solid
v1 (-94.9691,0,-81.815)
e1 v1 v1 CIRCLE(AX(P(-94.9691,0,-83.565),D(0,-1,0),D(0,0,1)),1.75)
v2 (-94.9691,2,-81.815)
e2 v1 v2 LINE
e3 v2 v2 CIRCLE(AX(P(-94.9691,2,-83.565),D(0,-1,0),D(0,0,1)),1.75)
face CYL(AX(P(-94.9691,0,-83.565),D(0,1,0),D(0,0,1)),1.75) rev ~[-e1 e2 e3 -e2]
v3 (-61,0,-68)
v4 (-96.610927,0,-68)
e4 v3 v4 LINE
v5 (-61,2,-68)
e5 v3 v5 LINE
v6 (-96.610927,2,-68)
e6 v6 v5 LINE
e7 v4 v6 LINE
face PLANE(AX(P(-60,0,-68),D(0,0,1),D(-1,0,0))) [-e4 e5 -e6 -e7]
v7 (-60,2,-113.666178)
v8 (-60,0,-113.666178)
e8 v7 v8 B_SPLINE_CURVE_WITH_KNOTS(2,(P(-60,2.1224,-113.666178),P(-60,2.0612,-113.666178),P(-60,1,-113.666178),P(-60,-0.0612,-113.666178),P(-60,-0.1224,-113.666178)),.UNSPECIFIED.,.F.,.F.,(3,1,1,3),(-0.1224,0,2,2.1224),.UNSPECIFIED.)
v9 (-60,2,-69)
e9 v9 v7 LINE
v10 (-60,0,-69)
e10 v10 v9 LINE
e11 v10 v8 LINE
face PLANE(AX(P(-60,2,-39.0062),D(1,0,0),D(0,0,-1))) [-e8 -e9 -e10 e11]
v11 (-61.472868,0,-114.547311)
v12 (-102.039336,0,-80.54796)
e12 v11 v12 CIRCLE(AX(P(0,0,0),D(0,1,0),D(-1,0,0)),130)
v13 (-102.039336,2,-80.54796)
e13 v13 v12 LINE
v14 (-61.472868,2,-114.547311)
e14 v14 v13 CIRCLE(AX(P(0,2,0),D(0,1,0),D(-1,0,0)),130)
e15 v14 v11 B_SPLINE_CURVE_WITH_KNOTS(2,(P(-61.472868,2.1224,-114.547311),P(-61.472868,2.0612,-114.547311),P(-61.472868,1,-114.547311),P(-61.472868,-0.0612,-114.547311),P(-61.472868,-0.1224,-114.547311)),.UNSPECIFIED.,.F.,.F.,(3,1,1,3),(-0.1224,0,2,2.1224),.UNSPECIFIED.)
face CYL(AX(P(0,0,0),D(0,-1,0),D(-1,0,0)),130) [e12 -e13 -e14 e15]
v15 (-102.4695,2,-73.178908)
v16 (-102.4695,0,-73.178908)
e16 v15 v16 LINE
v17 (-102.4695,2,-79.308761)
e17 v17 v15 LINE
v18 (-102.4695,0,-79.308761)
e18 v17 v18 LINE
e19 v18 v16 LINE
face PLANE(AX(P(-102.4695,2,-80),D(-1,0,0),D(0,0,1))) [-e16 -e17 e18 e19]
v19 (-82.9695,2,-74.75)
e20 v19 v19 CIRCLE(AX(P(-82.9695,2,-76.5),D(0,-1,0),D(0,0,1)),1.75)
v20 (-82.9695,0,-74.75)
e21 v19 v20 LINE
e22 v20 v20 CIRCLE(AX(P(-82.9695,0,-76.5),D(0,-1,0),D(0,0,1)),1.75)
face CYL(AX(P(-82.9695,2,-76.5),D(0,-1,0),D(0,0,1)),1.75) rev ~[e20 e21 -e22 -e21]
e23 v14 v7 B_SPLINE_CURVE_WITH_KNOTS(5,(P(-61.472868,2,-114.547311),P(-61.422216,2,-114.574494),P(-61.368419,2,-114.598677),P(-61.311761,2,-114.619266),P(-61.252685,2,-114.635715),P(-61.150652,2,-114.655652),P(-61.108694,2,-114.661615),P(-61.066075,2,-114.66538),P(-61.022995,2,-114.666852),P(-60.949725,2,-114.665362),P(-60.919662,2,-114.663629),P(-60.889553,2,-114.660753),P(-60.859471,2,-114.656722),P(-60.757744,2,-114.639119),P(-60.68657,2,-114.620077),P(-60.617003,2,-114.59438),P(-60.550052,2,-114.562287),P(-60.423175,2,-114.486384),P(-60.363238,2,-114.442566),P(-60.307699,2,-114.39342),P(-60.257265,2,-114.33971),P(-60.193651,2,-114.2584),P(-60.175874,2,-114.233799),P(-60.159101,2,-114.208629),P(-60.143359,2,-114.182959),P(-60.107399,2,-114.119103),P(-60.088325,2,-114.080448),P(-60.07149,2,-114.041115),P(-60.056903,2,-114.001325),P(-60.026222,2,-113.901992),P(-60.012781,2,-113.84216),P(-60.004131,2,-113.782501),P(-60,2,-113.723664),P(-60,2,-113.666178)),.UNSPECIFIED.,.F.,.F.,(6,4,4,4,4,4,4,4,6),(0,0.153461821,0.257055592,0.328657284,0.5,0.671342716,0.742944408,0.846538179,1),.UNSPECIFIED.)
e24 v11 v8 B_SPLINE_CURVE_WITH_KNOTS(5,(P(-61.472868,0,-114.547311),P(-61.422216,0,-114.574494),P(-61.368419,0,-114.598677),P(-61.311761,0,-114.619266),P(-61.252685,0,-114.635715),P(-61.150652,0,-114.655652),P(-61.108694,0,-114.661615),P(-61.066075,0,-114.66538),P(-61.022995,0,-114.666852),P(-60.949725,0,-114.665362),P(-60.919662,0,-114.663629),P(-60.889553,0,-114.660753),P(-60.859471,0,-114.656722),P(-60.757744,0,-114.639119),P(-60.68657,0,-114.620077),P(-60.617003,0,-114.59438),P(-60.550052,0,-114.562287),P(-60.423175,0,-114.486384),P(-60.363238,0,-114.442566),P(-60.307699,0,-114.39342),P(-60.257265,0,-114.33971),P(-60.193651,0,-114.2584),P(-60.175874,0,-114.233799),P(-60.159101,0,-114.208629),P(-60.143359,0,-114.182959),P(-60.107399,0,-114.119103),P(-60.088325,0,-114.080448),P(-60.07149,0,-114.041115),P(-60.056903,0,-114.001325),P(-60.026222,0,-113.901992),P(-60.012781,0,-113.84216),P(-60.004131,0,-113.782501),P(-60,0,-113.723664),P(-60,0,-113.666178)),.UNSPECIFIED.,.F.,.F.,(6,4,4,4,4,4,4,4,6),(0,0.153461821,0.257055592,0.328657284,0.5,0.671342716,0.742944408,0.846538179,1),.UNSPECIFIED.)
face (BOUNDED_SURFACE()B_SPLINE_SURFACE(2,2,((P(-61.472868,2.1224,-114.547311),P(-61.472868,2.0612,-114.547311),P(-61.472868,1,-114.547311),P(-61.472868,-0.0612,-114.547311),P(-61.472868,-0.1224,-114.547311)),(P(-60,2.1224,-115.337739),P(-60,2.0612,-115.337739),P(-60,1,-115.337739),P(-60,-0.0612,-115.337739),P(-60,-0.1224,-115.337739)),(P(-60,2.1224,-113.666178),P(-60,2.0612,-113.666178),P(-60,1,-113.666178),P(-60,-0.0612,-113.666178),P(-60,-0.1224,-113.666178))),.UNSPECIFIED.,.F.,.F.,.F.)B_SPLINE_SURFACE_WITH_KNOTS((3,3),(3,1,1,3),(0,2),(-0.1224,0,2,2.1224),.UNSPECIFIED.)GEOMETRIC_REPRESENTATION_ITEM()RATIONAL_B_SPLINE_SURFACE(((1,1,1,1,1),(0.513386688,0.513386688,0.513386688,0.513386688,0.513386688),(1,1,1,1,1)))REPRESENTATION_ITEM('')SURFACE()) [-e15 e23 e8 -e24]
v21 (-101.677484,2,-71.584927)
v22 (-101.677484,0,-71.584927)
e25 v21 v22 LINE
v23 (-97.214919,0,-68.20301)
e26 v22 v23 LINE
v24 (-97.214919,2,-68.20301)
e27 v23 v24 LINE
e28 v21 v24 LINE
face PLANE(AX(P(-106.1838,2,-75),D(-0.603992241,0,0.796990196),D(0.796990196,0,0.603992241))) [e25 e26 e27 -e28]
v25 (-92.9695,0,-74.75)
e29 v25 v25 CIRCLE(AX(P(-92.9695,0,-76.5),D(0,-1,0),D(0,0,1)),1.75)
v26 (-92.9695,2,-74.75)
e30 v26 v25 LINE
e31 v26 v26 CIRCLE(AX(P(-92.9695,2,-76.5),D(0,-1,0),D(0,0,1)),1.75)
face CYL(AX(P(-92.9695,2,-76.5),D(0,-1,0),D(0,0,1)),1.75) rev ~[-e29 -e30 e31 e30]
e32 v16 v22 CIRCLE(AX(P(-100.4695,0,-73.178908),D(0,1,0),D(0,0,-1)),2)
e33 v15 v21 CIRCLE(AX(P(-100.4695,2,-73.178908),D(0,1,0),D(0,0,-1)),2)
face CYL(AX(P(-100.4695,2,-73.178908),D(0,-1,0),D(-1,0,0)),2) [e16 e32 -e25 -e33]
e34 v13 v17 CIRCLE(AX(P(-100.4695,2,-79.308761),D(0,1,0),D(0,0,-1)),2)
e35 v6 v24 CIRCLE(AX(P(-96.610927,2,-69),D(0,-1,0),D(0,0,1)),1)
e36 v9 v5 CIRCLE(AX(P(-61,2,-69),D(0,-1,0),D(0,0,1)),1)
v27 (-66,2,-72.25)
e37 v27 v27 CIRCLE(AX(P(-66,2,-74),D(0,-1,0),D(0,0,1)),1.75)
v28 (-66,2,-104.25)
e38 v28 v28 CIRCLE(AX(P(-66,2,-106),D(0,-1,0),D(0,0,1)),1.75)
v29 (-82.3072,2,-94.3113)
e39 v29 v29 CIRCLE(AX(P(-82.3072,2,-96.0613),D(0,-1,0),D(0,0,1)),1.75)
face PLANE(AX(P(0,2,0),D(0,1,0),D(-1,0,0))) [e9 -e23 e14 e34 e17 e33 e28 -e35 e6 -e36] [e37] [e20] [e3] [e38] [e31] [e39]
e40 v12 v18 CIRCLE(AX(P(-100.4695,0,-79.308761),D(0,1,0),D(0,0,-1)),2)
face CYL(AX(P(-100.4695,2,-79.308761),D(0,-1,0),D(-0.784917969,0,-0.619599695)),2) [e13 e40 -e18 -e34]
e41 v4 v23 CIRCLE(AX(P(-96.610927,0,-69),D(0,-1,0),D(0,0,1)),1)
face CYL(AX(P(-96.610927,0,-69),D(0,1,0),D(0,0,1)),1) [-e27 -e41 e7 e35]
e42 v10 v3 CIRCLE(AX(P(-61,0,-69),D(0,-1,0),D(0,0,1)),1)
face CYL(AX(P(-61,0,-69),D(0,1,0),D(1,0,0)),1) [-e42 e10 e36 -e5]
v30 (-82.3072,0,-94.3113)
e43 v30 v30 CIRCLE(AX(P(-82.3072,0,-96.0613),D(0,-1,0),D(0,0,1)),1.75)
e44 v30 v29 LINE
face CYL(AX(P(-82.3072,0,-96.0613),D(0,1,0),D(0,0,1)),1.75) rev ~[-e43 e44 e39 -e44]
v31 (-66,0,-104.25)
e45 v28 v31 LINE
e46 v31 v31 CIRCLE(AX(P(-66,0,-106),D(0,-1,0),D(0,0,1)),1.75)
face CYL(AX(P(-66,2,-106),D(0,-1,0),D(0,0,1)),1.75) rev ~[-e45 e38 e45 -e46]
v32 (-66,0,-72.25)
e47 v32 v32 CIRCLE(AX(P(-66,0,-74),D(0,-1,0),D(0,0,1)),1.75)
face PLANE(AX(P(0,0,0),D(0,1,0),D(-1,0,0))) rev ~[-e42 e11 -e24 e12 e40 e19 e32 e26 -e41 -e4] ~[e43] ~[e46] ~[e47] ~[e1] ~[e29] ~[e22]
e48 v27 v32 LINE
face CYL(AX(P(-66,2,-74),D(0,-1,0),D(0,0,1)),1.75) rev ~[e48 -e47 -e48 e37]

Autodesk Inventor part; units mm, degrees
ref_plane "YZ Plane" through (0, 0, 0) normal (1, 0, 0) x (0, 1, 0)
ref_plane "XZ Plane" through (0, 0, 0) normal (0, 1, 0) x (-1, 0, 0)
ref_plane "XY Plane" through (0, 0, 0) normal (0, 0, 1) x (1, 0, 0)
sketch "スケッチ1" plane through (0, 0, 0) normal (0, 1, 0) x (-1, 0, 0)
  circle A0 centre (0, 0) radius 130
  dimension "d0" = 260
extrude "プレート1" add sketch "スケッチ1" along normal blind 2
sketch "スケッチ2" plane through (0, 2, 0) normal (0, 1, 0) x (1, 0, 0)
  line L0 (85, -40) -> (109, -40)
  line L1 (109, -40) -> (109, 40)
  line L2 (109, 40) -> (85, 40)
  line L3 (85, 40) -> (85, -40)
  line L4 (85, -40) -> (109, 40) construction
  line L5 (109, -40) -> (85, 40) construction
  point P0 (0, 0)
  point P1 (97, 0)
  dimension "d2" = 24
  dimension "d3" = 85
  dimension "d6" = 80
extrude "押し出し1" cut sketch "スケッチ2" against normal through all
fillet "フィレット1" radius 10 4 edges at (109, 1, 40) (85, 1, 40) (85, 1, -40) (109, 1, -40)
sketch "スケッチ3" plane through (0, 2, 0) normal (0, 1, 0) x (1, 0, 0)
  line L0 (85, -30) -> (85, 30) projected
  line L1 (109, 30) -> (109, -30) projected
  line L2 (95, 40) -> (99, 40) projected
  line L3 (99, -40) -> (95, -40) projected
  line L4 (82, -20) -> (112, -20) construction
  line L5 (112, -20) -> (112, 20) construction
  line L6 (112, 20) -> (82, 20) construction
  line L7 (82, 20) -> (82, -20) construction
  line L8 (82, -20) -> (112, 20) construction
  line L9 (112, -20) -> (82, 20) construction
  point P0 (0, 0)
  point P1 (97, 0)
  point P2 (97, 40)
  point P3 (109, 0)
  dimension "d8" = 30
  dimension "d9" = 40
hole "穴1" at (82, 2, 20) at (112, 2, 20) at (112, 2, -20) at (82, 2, -20) direction (0, -1, 0) diameter 3.5 depth 2 tip angle 118
sketch "スケッチ4" plane through (0, 2, 0) normal (0, 1, 0) x (1, 0, 0)
  circle A0 centre (0, 0) radius 130 projected
  line L0 (-106.1838, 75) -> (-60, 40)
  line L1 (-60, 40) -> (-60, -40)
  line L2 (-60, -40) -> (-106.1838, -75)
  point P0 (-60, 0)
  dimension "d17" = 40
  dimension "d18" = 75
  dimension "d19" = 60
extrude "押し出し2" cut sketch "スケッチ4" against normal through all contours L0 L1 L2 A0 picked at (-83.3333, 0)
sketch "スケッチ5" plane through (0, 2, 0) normal (0, 1, 0) x (1, 0, 0)
  line L0 (-47.5, 87) -> (47.5, 87)
  line L1 (47.5, 87) -> (47.5, 106)
  line L2 (47.5, 106) -> (-47.5, 106)
  line L3 (-47.5, 106) -> (-47.5, 87)
  line L4 (-47.5, 87) -> (47.5, 106) construction
  line L5 (47.5, 87) -> (-47.5, 106) construction
  line L6 (-13.5, 81.5) -> (13.5, 81.5)
  line L7 (13.5, 81.5) -> (13.5, 87)
  line L8 (13.5, 87) -> (-13.5, 87)
  line L9 (-13.5, 87) -> (-13.5, 81.5)
  line L10 (-13.5, 81.5) -> (13.5, 87) construction
  line L11 (13.5, 81.5) -> (-13.5, 87) construction
  line L12 (-13.5, 81.5) -> (-12.7575, 82.2425) construction
  line L13 (-13.5, 81.5) -> (-12.45, 81.5) construction
  line L14 (13.5, 81.5) -> (12.7575, 82.2425) construction
  line L15 (13.5, 81.5) -> (14.55, 81.5) construction
  circle A0 centre (12.7575, 82.2425) radius 1.05
  circle A1 centre (-12.7575, 82.2425) radius 1.05
  line L16 (47.5, 87) -> (62.5, 87)
  line L17 (62.5, 87) -> (62.5, 97)
  line L18 (62.5, 97) -> (47.5, 97)
  line L19 (47.5, 97) -> (47.5, 87)
  line L20 (-13.5, 111.5) -> (13.5, 111.5)
  line L21 (13.5, 111.5) -> (13.5, 106)
  line L22 (13.5, 106) -> (-13.5, 106)
  line L23 (-13.5, 106) -> (-13.5, 111.5)
  line L24 (-13.5, 111.5) -> (13.5, 106) construction
  line L25 (13.5, 111.5) -> (-13.5, 106) construction
  line L26 (-13.5, 111.5) -> (-12.7575, 110.7575) construction
  line L27 (-13.5, 111.5) -> (-12.45, 111.5) construction
  line L28 (13.5, 111.5) -> (12.7575, 110.7575) construction
  line L29 (13.5, 111.5) -> (14.55, 111.5) construction
  circle A2 centre (-12.7575, 110.7575) radius 1.05
  circle A3 centre (12.7575, 110.7575) radius 1.05
  point P0 (0, 0)
  point P1 (0, 96.5)
  point P2 (0, 84.25)
  point P3 (-13.5, 82.9849)
  point P4 (-12.0151, 81.5)
  point P5 (12.0151, 81.5)
  point P6 (13.5, 82.9849)
  point P7 (47.5, 97)
  point P8 (0, 108.75)
  point P9 (-13.5, 110.0151)
  point P10 (13.5, 110.0151)
  point P11 (12.0151, 111.5)
  point P12 (-12.0151, 111.5)
  dimension "d22" = 19
  dimension "d23" = 95
  dimension "d24" = 87
  dimension "d25" = 5.5
  dimension "d26" = 27
  dimension "d27" = 1.05
  dimension "d28" = 45
  dimension "d29" = 1.05
  dimension "d30" = 135
  dimension "d44" = 10
  dimension "d45" = 15
  dimension "d46" = 5.5
  dimension "d47" = 1.05
  dimension "d48" = 45
  dimension "d49" = 1.05
  dimension "d50" = 135
extrude "押し出し3" cut sketch "スケッチ5" against normal through all
sketch "スケッチ6" plane through (0, 2, 0) normal (0, 1, 0) x (1, 0, 0)
  line L0 (-20, 84) -> (20, 84) construction
  line L1 (-20, 84) -> (20, 84) construction
  line L2 (12.0151, 81.5) -> (-12.0151, 81.5) construction
  line L3 (-20, 109) -> (20, 109) construction
  line L4 (13.5, 106) -> (47.5, 106) construction
  line L5 (-20, 109) -> (20, 109) construction
  line L6 (-12.0151, 111.5) -> (12.0151, 111.5) construction
  point P0 (0, 0)
  point P1 (0, 84)
  point P2 (0, 109)
  point P3 (0, 84)
  dimension "d33" = 40
  dimension "d34" = 0
  dimension "d35" = 2.5
  dimension "d51" = 40
  dimension "d52" = 0
  dimension "d53" = 2.5
hole "穴2" at (20, 2, -84) at (-20, 2, -84) at (-20, 2, -109) at (20, 2, -109) direction (0, -1, 0) diameter 3.5 depth 2 tip angle 118
fillet "フィレット2" radius 1 4 edges at (-13.5, 1, -87) (13.5, 1, -87) (-13.5, 1, -106) (13.5, 1, -106)
fillet "フィレット3" radius 3 6 edges at (-47.5, 1, -87) (-47.5, 1, -106) (47.5, 1, -106) (47.5, 1, -97) (62.5, 1, -97) (62.5, 1, -87)
mirror "ミラー1" about plane through (0, 0, 0) normal (0, 0, 1) of "穴2", "押し出し3", "フィレット2", "フィレット3"
sketch "スケッチ7" plane through (0, 2, 0) normal (0, 1, 0) x (1, 0, 0)
  arc A0 (-106.1838, -75) -> (-106.1838, 75) centre (0, 0) ccw projected
  line L0 (-48.7827, 120.5) -> (48.7827, 120.5)
  line L1 (-48.7827, -120.5) -> (48.7827, -120.5)
  line L2 (123, -42.0833) -> (123, 42.0833)
  line L3 (-12.0151, 111.5) -> (12.0151, 111.5) projected
  circle A1 centre (112, 20) radius 1.75 projected
  line L4 (12.0151, -111.5) -> (-12.0151, -111.5) projected
  dimension "d55" = 9
  dimension "d56" = 11
  dimension "d57" = 9
extrude "押し出し4" cut sketch "スケッチ7" against normal through all contours L1 A0 | L2 A0 | L0 A0
fillet "フィレット4" radius 50 6 edges at (48.7827, 1, 120.5) (-48.7827, 1, 120.5) (123, 1, -42.0833) (123, 1, 42.0833) (-48.7827, 1, -120.5) (48.7827, 1, -120.5)
sketch "スケッチ8" plane through (0, 0, 0) normal (0, -1, 0) x (1, 0, 0)
  arc A0 (97.4046, 79.5902) -> (95.9996, 79.4659) centre (96.7931, 78.5) ccw projected
  arc A1 (52.5865, 79.4659) -> (51.1816, 79.5902) centre (51.7931, 78.5) ccw projected
  point P0 (0, 0)
hole "穴3" at (96.7931, 0, 78.5) at (51.7931, 0, 78.5) direction (0, 1, 0) diameter 3.5 depth 2 tip angle 118
sketch "スケッチ10" plane through (0, 2, 0) normal (0, 1, 0) x (1, 0, 0)
  line L0 (-32.5, -116.5) -> (32.5, -116.5) construction
  line L1 (-32.5, -116.5) -> (32.5, -116.5) construction
  line L2 (-37.812, -120.5) -> (37.812, -120.5) construction
  point P0 (0, 0)
  point P1 (0, -116.5)
  dimension "d78" = 65
  dimension "d79" = 0
  dimension "d80" = 4
hole "穴5" at (32.5, 2, 116.5) at (-32.5, 2, 116.5) direction (0, -1, 0) diameter 3.5 end through all
mirror "ミラー2" about plane through (0, 0, 0) normal (0, 0, 1) of "穴3", "穴5"
sketch "スケッチ9" plane through (0, 2, 0) normal (0, 1, 0) x (1, 0, 0)
  line L0 (110, -55) -> (110, 55) construction
  line L1 (109, 30) -> (109, -30) construction
  line L2 (110, -55) -> (220, -55) construction
  point P0 (0, 0)
  point P1 (110, 0)
  dimension "d68" = 110
  dimension "d69" = 90
  dimension "d70" = 110
hole "穴4" at (110, 2, 55) at (110, 2, -55) direction (0, -1, 0) diameter 3.5 depth 2 tip angle 118
sketch "スケッチ11" plane through (0, 2, 0) normal (0, 1, 0) x (1, 0, 0)
  line L0 (-45, 7.5) -> (40, 7.5) construction
  line L1 (40, 7.5) -> (40, 72.5) construction
  line L2 (40, 72.5) -> (-45, 72.5) construction
  line L3 (-45, 72.5) -> (-45, 7.5) construction
  line L4 (-45, 7.5) -> (40, 72.5) construction
  line L5 (40, 7.5) -> (-45, 72.5) construction
  line L6 (-60, 40) -> (-60, -40) construction
  point P0 (0, 0)
  point P1 (-2.5, 40)
  dimension "d88" = 85
  dimension "d89" = 65
  dimension "d90" = 7.5
  dimension "d91" = 15
hole "穴6" at (-45, 2, -7.5) at (40, 2, -7.5) at (40, 2, -72.5) at (-45, 2, -72.5) direction (0, -1, 0) diameter 2.5 end through all
sketch "スケッチ12" plane through (0, 2, 0) normal (0, 1, 0) x (1, 0, 0)
  line L0 (-15, 40) -> (10, 40) construction
  line L1 (-15, 10) -> (10, 10)
  line L2 (10, 70) -> (-15, 70)
  arc A0 (-15, 70) -> (-15, 10) centre (-15, 40) ccw
  arc A1 (10, 10) -> (10, 70) centre (10, 40) ccw
  circle A2 centre (-45, 72.5) radius 1.25 projected
  circle A3 centre (-45, 7.5) radius 1.25 projected
  point P0 (0, 0)
  point P1 (-2.5, 40)
  dimension "d99" = 25
  dimension "d100" = 30
  dimension "d101" = 42.5
  dimension "d102" = 32.5
extrude "押し出し5" cut sketch "スケッチ12" against normal through all contours A0 L2 A1 L1
mirror "ミラー3" about plane through (0, 0, 0) normal (0, 0, 1) of "穴6", "押し出し5"
sketch "スケッチ13" plane through (0, 2, 0) normal (0, 1, 0) x (1, 0, 0)
  line L0 (-15, 0) -> (15, 0) construction
  line L1 (-15, 0) -> (15, 0) construction
  point P0 (0, 0)
  point P1 (0, 0)
  dimension "d105" = 30
  dimension "d106" = 0
hole "穴7" at (-15, 2, 0) at (15, 2, 0) direction (0, -1, 0) diameter 2.5 end through all
sketch "スケッチ14" plane through (0, 2, 0) normal (0, 1, 0) x (1, 0, 0)
  line L0 (-106.1838, 75) -> (-60, 40) projected
  arc A0 (-61.4446, 114.5625) -> (-106.1838, 75) centre (0, 0) ccw projected
  line L1 (-60, -40) -> (-106.1838, -75) projected
  arc A1 (-106.1838, -75) -> (-61.4446, -114.5625) centre (0, 0) ccw projected
  line L2 (-102.4695, 80) -> (-102.4695, -80)
  line L3 (-102.4695, 80) -> (57.5305, 80) construction
  point P0 (-102.4695, 72.1852)
  point P1 (-102.4695, -72.1852)
  dimension "d114" = 160
  dimension "d115" = 90
extrude "押し出し6" cut sketch "スケッチ14" against normal through all
sketch "スケッチ15" plane through (0, 2, 0) normal (0, 1, 0) x (1, 0, 0)
  line L0 (-92.9695, -76.5) -> (-82.9695, -76.5) construction
  line L1 (-82.9695, -76.5) -> (-82.9695, 76.5) construction
  line L2 (-82.9695, 76.5) -> (-92.9695, 76.5) construction
  line L3 (-92.9695, 76.5) -> (-92.9695, -76.5) construction
  line L4 (-92.9695, -76.5) -> (-82.9695, 76.5) construction
  line L5 (-82.9695, -76.5) -> (-92.9695, 76.5) construction
  line L6 (-102.4695, 80) -> (-102.4695, 72.1852) construction
  point P0 (0, 0)
  point P1 (-87.9695, 0)
  dimension "d118" = 10
  dimension "d119" = 153
  dimension "d120" = 9.5
hole "穴8" at (-92.9695, 2, -76.5) at (-82.9695, 2, -76.5) at (-82.9695, 2, 76.5) at (-92.9695, 2, 76.5) direction (0, -1, 0) diameter 3.5 end through all
sketch "スケッチ16" plane through (0, 0, 0) normal (0, -1, 0) x (1, 0, 0)
  circle A0 centre (-94.9691, 83.565) radius 1.75 projected
  circle A1 centre (-82.3072, 96.0613) radius 1.75 projected
  circle A2 centre (-94.9691, 83.565) radius 1.75 projected
  point P0 (0, 0)
hole "穴9" at (-94.9691, 0, 83.565) at (-82.3072, 0, 96.0613) direction (0, 1, 0) diameter 3.5 depth 2
mirror "ミラー4" about plane through (0, 0, 0) normal (0, 0, 1) of "穴9"
fillet "フィレット5" radius 2 6 edges at (-102.4695, 1, -72.1852) (-102.4695, 1, -80) (-102.4695, 1, 80) (-60, 1, -40) (-60, 1, 40) (-102.4695, 1, 72.1852)
sketch "スケッチ20" plane through (0, 2, 0) normal (0, 1, 0) x (1, 0, 0)
  line L0 (-60, 39.0062) -> (-60, -39.0062) projected
  arc A0 (-61.4446, 114.5625) -> (-102.0393, 80.548) centre (0, 0) ccw projected
  arc A1 (-102.0393, -80.548) -> (-61.4446, -114.5625) centre (0, 0) ccw projected
  arc A2 (-61.4446, -114.5625) -> (-37.812, -120.5) centre (-37.812, -70.5) ccw projected
  arc A3 (-37.812, 120.5) -> (-61.4446, 114.5625) centre (-37.812, 70.5) ccw projected
  line L1 (-60, 39.0062) -> (-60, 115.3073) construction
  line L2 (-60, -39.0062) -> (-60, -115.3073) construction
  line L3 (-66, 74) -> (-54, 74) construction
  line L4 (-54, 74) -> (-54, 106) construction
  line L5 (-54, 106) -> (-66, 106) construction
  line L6 (-66, 106) -> (-66, 74) construction
  line L7 (-66, 74) -> (-54, 106) construction
  line L8 (-54, 74) -> (-66, 106) construction
  line L9 (-66, -106) -> (-54, -106) construction
  line L10 (-54, -106) -> (-54, -74) construction
  line L11 (-54, -74) -> (-66, -74) construction
  line L12 (-66, -74) -> (-66, -106) construction
  line L13 (-66, -106) -> (-54, -74) construction
  line L14 (-54, -106) -> (-66, -74) construction
  point P0 (-60, 90)
  point P1 (-60, -90)
  dimension "d155" = 12
  dimension "d156" = 32
  dimension "d157" = 12
  dimension "d158" = 32
  dimension "d169" = 90
  dimension "d170" = 90
hole "穴10" at (-54, 2, -74) at (-66, 2, -74) at (-66, 2, -106) at (-54, 2, -106) at (-66, 2, 74) at (-54, 2, 74) at (-54, 2, 106) at (-66, 2, 106) direction (0, -1, 0) diameter 3.5 depth 2
sketch "スケッチ21" plane through (0, 2, 0) normal (0, 1, 0) x (1, 0, 0)
  line L0 (-60, 39.0062) -> (-60, -39.0062) projected
  arc A0 (-61.4446, -114.5625) -> (-37.812, -120.5) centre (-37.812, -70.5) ccw projected
  arc A1 (-37.812, 120.5) -> (-61.4446, 114.5625) centre (-37.812, 70.5) ccw projected
  arc A2 (-61.4446, 114.5625) -> (-102.0393, 80.548) centre (0, 0) ccw projected
  arc A3 (-102.0393, -80.548) -> (-61.4446, -114.5625) centre (0, 0) ccw projected
  line L1 (-60, 39.0062) -> (-60, 115.3073)
  line L2 (-60.792, -40.6002) -> (-101.6775, -71.5849) projected
  line L3 (-60, -39.0062) -> (-60, -115.3073)
  line L4 (-102.4695, -73.1789) -> (-102.4695, -79.3088) projected
  arc A4 (-101.6775, -71.5849) -> (-102.4695, -73.1789) centre (-100.4695, -73.1789) ccw projected
  arc A5 (-102.4695, -79.3088) -> (-102.0393, -80.548) centre (-100.4695, -79.3088) ccw projected
  line L5 (-101.6775, 71.5849) -> (-60.792, 40.6002) projected
  line L6 (-102.4695, 79.3088) -> (-102.4695, 73.1789) projected
  arc A6 (-102.4695, 73.1789) -> (-101.6775, 71.5849) centre (-100.4695, 73.1789) ccw projected
  arc A7 (-102.0393, 80.548) -> (-102.4695, 79.3088) centre (-100.4695, 79.3088) ccw projected
  arc A8 (-60, 39.0062) -> (-60.792, 40.6002) centre (-62, 39.0062) ccw projected
  line L7 (37.812, 120.5) -> (-37.812, 120.5) projected
  arc A9 (61.4446, 114.5625) -> (37.812, 120.5) centre (37.812, 70.5) ccw projected
  arc A10 (118.625, 53.18) -> (61.4446, 114.5625) centre (0, 0) ccw projected
  line L8 (123, -32.7261) -> (123, 32.7261) projected
  arc A11 (123, 32.7261) -> (118.625, 53.18) centre (73, 32.7261) ccw projected
  arc A12 (118.625, -53.18) -> (123, -32.7261) centre (73, -32.7261) ccw projected
  arc A13 (61.4446, -114.5625) -> (118.625, -53.18) centre (0, 0) ccw projected
  arc A14 (37.812, -120.5) -> (61.4446, -114.5625) centre (37.812, -70.5) ccw projected
  line L9 (-37.812, -120.5) -> (37.812, -120.5) projected
  arc A15 (-60.792, -40.6002) -> (-60, -39.0062) centre (-62, -39.0062) ccw projected
  point P0 (-60.0015, 39.0827)
extrude "押し出し10" cut sketch "スケッチ21" against normal through all contours L1 A1 L7 A9 A10 A11 L8 A12 A13 A14 L9 A0 L3 L0 | L3 A0 A3 A5 L4 A4 L2 A15
sketch "スケッチ22" plane through (0, 0, 0) normal (0, -1, 0) x (1, 0, 0)
  line L0 (-60.792, -40.6002) -> (-101.6775, -71.5849) projected
  line L1 (-60, -115.3073) -> (-60, -39.0062) projected
  arc A0 (-60.792, -40.6002) -> (-60, -39.0062) centre (-62, -39.0062) ccw projected
  line L2 (-60, -68) -> (-96.947, -68)
  circle A1 centre (-66, -74) radius 1.75 projected
  point P0 (0, 0)
  dimension "d171" = 6
extrude "押し出し11" cut sketch "スケッチ22" against normal through all contours A0 L1 L2 L0
fillet "フィレット6" radius 1 3 edges at (-60, 1, -115.3073) (-96.947, 1, -68) (-60, 1, -68)
equation "\"d15\" = Thickness"
equation "\"d46\" = d25"
equation "\"d53\" = d35"
equation "\"d41\" = Thickness"
equation "\"d57\" = d55"
equation "\"d66\" = Thickness"
equation "\"d86\" = Thickness"
equation "\"d76\" = Thickness"
equation "\"d1\" = Thickness"
equation "\"BendRadius\" = Thickness"
equation "\"BendReliefWidth\" = Thickness"
equation "\"BendReliefDepth\" = 0.5 * Thickness"
equation "\"CornerReliefSize\" = 4 * Thickness"
equation "\"MinimumRemnant\" = 2 * Thickness"
equation "\"TransitionRadius\" = BendRadius"
equation "\"JacobiRadiusSize\" = BendRadius"
equation "\"GapSize\" = Thickness"
equation "\"Thickness\" = 2"
properties part number "T2.0_frame-base1_extend-1"
